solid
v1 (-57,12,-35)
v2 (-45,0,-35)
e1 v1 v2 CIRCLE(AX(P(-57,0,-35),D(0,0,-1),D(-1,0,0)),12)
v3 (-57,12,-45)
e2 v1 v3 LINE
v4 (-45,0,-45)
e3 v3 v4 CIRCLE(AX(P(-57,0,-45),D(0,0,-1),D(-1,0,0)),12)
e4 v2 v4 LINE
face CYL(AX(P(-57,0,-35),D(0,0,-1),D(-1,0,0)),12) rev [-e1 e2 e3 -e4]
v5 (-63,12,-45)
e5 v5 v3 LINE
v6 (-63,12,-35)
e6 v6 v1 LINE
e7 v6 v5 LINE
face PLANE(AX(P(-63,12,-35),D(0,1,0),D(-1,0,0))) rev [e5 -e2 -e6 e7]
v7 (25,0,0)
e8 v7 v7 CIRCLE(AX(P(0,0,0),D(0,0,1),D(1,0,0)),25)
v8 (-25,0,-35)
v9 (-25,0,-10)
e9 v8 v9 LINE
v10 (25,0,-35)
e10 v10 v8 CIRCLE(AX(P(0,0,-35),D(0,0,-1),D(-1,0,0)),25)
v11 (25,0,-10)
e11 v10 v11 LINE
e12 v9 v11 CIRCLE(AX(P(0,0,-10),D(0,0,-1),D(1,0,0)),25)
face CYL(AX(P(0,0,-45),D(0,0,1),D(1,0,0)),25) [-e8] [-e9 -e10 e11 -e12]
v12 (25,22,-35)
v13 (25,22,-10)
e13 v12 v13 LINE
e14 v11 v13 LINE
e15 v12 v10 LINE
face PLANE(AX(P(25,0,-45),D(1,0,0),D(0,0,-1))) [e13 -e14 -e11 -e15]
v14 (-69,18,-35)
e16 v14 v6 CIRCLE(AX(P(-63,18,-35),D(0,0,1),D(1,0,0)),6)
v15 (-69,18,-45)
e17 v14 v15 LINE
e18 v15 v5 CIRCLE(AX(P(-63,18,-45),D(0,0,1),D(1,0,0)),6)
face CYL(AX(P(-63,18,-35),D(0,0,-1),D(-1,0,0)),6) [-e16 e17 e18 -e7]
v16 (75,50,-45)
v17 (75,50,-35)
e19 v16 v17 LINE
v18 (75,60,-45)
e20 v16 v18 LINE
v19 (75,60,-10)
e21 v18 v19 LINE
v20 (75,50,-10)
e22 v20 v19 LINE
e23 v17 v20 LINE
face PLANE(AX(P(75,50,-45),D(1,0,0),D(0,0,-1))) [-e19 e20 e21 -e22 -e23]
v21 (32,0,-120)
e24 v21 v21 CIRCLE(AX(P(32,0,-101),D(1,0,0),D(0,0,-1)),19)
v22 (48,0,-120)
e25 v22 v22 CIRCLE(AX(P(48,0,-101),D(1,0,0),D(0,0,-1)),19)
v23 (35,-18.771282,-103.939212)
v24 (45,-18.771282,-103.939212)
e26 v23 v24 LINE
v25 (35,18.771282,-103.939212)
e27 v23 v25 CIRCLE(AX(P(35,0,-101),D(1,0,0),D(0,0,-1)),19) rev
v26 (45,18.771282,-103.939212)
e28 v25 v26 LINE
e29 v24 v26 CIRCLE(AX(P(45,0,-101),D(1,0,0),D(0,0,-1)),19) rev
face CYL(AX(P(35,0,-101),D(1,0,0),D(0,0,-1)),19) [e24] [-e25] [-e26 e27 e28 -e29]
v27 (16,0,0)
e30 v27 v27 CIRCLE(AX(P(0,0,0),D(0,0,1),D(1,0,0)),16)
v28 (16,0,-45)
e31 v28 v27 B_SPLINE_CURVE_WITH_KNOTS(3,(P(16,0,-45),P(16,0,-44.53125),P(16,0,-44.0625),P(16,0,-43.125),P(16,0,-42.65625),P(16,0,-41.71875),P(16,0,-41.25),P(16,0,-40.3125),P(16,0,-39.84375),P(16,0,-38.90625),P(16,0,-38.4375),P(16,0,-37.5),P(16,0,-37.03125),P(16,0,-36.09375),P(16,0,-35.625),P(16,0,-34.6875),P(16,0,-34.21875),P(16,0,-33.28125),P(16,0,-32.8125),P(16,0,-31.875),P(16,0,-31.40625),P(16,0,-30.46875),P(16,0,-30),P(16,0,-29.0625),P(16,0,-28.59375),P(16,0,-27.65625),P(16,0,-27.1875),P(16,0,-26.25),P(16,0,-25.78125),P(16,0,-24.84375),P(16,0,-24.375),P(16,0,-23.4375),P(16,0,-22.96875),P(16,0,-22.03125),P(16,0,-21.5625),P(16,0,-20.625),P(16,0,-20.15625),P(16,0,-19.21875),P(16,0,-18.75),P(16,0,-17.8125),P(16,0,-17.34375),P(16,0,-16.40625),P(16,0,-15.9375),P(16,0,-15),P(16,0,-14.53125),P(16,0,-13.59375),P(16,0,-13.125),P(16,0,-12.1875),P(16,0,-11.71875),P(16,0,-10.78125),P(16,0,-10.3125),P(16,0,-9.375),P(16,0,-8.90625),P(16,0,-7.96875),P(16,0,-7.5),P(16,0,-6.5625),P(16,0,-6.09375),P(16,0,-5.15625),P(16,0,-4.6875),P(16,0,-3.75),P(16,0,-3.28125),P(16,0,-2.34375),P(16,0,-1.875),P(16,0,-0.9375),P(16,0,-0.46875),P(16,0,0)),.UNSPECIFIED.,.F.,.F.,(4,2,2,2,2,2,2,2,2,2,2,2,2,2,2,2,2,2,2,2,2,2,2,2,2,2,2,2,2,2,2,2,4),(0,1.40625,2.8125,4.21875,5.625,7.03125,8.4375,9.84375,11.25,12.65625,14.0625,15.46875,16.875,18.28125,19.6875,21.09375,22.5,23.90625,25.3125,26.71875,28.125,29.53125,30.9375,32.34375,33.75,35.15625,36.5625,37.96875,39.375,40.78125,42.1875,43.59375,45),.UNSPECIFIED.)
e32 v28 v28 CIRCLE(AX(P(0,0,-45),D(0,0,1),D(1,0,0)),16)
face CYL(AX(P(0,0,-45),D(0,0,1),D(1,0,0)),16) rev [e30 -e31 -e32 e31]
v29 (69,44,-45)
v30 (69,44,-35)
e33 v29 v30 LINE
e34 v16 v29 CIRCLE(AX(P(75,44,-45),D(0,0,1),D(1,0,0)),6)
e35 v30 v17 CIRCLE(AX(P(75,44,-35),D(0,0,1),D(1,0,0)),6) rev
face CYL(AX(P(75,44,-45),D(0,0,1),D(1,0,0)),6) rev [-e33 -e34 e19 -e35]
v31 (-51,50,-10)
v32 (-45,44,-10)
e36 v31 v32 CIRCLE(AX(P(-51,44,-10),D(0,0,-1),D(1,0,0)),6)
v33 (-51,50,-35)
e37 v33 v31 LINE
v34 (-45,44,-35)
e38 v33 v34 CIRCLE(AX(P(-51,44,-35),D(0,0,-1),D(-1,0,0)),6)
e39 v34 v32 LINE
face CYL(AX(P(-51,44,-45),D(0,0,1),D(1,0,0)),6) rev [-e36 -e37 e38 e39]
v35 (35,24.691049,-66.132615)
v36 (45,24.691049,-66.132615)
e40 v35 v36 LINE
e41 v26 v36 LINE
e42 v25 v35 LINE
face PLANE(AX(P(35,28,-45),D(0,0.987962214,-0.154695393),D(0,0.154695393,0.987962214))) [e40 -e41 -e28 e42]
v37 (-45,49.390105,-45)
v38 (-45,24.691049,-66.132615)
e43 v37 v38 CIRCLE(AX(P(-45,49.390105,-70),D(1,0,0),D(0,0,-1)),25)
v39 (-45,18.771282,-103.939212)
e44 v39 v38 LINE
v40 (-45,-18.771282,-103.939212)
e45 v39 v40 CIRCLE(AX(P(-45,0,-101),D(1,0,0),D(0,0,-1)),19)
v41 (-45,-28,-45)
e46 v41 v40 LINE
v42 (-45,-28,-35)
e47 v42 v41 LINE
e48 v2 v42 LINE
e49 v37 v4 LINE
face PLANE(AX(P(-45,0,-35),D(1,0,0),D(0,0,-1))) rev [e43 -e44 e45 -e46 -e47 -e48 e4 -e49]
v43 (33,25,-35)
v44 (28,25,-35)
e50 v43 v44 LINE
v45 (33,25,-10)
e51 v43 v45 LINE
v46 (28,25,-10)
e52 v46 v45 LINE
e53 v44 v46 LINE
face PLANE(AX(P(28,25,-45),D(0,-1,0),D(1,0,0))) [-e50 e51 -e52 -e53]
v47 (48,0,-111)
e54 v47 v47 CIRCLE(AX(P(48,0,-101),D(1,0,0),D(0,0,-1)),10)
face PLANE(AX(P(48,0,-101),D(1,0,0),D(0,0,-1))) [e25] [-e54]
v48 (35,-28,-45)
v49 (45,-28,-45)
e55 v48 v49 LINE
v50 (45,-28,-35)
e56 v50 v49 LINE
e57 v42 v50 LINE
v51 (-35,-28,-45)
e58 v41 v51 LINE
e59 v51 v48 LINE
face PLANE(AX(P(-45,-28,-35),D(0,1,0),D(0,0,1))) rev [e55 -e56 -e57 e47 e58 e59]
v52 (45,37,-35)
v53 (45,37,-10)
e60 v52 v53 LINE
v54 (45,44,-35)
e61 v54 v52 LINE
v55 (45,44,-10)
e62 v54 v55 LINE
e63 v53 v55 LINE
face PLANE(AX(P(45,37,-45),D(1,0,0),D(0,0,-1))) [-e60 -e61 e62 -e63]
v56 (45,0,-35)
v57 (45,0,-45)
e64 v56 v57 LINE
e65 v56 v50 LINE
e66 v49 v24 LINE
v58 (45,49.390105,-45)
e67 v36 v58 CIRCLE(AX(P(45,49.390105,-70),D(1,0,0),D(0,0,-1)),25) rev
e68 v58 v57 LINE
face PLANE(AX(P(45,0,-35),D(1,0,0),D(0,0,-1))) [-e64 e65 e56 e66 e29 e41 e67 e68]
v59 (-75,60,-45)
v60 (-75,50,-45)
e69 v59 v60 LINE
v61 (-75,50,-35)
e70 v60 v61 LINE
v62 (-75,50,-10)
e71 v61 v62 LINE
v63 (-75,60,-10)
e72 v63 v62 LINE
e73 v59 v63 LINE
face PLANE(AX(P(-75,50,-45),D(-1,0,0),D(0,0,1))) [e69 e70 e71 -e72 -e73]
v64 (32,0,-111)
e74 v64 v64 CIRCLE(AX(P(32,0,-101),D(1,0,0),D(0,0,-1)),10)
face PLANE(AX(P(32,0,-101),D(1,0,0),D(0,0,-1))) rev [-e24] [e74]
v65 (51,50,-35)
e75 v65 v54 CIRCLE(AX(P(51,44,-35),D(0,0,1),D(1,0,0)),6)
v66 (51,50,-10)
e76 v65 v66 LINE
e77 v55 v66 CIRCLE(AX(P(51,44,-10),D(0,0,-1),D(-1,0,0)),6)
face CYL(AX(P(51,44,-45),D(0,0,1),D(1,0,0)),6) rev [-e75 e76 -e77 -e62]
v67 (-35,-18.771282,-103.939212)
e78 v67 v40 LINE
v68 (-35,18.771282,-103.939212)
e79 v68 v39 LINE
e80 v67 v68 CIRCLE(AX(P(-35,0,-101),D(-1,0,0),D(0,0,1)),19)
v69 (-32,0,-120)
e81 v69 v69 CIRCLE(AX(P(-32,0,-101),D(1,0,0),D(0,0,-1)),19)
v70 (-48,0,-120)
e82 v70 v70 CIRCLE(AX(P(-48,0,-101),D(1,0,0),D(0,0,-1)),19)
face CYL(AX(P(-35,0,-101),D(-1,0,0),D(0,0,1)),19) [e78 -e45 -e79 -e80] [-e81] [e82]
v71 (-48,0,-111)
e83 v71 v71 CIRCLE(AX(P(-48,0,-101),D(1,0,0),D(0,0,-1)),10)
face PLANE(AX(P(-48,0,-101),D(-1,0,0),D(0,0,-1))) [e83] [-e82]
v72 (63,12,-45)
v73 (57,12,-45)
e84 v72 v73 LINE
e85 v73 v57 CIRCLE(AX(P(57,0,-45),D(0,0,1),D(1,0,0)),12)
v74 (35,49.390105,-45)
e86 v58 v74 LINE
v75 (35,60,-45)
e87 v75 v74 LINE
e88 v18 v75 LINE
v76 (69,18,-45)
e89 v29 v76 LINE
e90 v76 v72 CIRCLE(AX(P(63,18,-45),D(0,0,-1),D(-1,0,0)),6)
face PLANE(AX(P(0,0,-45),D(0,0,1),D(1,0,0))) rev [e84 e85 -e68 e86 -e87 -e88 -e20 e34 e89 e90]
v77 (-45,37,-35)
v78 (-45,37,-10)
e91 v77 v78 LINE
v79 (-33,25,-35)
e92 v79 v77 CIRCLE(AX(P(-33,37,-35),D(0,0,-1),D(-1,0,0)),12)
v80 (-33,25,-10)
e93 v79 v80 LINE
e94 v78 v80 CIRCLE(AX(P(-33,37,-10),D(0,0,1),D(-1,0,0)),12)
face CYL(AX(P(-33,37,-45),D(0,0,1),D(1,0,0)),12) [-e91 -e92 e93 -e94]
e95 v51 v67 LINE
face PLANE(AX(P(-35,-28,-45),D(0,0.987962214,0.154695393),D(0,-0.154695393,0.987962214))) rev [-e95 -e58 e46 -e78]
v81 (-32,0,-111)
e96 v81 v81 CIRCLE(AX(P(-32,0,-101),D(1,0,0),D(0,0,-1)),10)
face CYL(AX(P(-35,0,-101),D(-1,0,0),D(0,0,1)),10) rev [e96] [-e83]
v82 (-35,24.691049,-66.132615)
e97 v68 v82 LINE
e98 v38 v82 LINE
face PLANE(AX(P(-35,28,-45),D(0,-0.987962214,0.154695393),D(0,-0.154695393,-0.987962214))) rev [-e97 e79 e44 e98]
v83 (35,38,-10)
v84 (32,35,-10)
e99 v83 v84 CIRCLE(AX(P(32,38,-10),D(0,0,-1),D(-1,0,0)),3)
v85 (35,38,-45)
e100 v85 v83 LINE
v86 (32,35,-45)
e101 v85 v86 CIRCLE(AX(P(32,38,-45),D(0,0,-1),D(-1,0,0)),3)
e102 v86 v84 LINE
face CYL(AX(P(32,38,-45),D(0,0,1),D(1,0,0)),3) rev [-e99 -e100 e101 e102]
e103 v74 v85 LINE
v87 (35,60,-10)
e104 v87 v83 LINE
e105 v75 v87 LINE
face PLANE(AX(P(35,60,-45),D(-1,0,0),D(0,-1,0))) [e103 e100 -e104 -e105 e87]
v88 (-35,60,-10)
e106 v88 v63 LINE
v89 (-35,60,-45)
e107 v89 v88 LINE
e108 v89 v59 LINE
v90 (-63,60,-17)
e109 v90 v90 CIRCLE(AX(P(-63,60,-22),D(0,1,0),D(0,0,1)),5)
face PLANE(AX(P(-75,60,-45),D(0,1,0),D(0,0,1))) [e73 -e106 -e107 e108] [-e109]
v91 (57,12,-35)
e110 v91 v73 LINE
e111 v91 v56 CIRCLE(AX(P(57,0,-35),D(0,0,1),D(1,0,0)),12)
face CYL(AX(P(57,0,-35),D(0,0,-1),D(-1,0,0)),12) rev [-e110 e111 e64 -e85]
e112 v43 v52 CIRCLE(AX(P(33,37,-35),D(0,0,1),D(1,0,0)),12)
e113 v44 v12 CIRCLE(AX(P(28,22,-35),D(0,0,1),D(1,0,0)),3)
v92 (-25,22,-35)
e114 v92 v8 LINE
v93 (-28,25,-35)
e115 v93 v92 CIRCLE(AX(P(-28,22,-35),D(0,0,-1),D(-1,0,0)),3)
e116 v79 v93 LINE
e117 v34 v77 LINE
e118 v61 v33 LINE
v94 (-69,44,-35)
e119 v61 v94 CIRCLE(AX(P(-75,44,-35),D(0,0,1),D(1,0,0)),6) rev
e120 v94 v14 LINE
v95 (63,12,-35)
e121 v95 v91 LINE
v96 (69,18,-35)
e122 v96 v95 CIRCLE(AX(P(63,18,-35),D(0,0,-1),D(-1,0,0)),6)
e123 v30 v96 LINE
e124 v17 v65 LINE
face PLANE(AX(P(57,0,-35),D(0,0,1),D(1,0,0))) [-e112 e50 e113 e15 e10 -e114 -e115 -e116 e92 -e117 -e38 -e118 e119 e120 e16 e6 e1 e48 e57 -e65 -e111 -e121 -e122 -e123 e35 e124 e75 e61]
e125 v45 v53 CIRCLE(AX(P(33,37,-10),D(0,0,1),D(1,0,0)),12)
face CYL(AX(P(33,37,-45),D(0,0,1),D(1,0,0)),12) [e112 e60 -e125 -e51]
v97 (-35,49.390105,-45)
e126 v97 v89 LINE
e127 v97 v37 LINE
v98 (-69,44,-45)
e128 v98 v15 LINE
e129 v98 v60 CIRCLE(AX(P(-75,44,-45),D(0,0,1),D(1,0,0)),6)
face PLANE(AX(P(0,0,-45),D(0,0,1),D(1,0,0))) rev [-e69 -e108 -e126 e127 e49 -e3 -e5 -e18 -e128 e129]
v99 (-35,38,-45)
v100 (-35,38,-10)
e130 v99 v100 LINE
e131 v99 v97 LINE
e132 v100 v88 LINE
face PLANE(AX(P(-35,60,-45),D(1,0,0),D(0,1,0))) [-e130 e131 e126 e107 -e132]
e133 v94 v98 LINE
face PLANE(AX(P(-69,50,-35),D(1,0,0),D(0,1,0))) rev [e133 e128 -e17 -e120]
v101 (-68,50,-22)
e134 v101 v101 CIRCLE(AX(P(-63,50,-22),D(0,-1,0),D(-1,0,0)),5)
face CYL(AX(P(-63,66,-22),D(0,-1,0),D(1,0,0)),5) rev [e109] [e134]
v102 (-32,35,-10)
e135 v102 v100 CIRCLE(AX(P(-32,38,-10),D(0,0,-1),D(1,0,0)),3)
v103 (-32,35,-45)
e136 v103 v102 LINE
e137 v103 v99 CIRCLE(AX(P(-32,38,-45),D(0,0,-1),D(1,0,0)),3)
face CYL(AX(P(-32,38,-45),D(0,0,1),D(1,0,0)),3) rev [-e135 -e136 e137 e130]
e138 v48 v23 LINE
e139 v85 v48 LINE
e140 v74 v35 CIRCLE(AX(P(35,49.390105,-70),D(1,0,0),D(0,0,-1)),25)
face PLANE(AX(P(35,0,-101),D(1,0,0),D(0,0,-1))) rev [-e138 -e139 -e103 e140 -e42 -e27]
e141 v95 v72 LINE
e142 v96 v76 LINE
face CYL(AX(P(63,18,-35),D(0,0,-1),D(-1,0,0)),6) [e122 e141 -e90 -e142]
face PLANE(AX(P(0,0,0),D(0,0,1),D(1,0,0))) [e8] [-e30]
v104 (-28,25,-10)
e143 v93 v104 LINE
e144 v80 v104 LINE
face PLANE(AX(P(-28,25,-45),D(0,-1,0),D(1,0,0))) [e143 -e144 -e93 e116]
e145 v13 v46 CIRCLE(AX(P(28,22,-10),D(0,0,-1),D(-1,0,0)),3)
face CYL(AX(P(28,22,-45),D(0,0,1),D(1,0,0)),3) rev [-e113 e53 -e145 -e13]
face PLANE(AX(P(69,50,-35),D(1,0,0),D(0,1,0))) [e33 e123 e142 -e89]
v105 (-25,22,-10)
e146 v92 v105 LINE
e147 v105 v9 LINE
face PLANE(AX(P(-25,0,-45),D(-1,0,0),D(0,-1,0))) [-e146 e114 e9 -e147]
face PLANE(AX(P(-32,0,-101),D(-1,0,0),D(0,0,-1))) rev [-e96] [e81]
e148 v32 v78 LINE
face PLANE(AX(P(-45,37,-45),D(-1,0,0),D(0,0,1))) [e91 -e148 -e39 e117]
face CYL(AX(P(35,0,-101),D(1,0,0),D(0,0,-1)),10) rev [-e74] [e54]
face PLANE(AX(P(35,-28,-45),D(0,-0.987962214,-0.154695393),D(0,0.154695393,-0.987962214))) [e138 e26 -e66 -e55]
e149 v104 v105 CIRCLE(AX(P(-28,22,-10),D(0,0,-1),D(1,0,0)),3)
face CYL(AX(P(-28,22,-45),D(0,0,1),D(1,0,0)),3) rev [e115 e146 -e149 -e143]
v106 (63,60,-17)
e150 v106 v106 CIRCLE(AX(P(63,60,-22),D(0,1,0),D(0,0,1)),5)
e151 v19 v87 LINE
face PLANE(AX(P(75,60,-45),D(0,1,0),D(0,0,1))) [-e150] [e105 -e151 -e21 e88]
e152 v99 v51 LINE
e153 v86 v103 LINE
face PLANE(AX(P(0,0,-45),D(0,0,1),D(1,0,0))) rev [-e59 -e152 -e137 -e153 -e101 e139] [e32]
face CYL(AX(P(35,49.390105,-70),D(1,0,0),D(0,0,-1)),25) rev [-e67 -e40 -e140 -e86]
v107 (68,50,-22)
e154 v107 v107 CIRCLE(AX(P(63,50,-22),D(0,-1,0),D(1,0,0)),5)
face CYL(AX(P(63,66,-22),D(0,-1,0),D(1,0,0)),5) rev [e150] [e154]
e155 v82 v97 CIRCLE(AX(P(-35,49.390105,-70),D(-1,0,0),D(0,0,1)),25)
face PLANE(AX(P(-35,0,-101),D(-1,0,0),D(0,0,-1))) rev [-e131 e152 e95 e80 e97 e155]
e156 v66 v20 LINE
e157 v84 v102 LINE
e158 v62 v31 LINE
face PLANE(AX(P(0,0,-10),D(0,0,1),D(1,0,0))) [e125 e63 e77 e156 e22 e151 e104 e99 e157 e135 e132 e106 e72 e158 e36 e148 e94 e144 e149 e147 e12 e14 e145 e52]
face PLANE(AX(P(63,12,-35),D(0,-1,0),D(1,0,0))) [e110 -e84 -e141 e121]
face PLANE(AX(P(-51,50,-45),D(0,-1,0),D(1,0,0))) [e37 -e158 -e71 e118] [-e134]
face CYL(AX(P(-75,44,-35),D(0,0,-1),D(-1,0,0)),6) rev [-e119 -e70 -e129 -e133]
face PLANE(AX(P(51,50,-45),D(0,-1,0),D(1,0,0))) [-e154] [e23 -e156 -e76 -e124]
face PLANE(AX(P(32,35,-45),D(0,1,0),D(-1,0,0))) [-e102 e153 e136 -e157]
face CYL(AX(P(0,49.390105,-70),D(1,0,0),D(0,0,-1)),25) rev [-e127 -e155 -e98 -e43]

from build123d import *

# Parameters (mm, degrees)
IZIM1_R                     = 25
IZIM1_R_2                   = 16
Y_KSEKLIK_EKSTR_ZYON1_DEPTH = 45
Y_KSEKLIK_EKSTR_ZYON2_DEPTH = 35
Y_KSEKLIK_EKSTR_ZYON4_START = -10
Y_KSEKLIK_EKSTR_ZYON4_DEPTH = 10
RADYUS2_R                   = 6
IZIM6_R                     = 10
Y_KSEKLIK_EKSTR_ZYON6_DEPTH = 10
IZIM7_R                     = 19
IZIM7_R_2                   = 10
Y_KSEKLIK_EKSTR_ZYON7_DEPTH = 8
RADYUS3_R                   = 25
AYNALAMA1_START             = -45
AYNALAMA1_OUTLINE_R         = 10
AYNALAMA1_DEPTH             = 10
AYNALAMA1_START_2           = -48
AYNALAMA1_2_OUTLINE_R       = 19
AYNALAMA1_2_OUTLINE_R_2     = 10
AYNALAMA1_2_DEPTH           = 16
IZIM8_R                     = 5
KES_EKSTR_ZYON1_DEPTH       = 16


# Read off the part's stored shape, not the designer's step: Aynalama1
# Some blends are built 0.0001 mm under size
with BuildPart() as part:
    # Çizim1 → Yükseklik-Ekstrüzyon1 (new body)
    with BuildSketch(Plane.XY):
        Circle(IZIM1_R)
        Circle(IZIM1_R_2, mode=Mode.SUBTRACT)
    extrude(amount=-Y_KSEKLIK_EKSTR_ZYON1_DEPTH)

    # Çizim4 → Yükseklik-Ekstrüzyon2 (add)
    with BuildSketch(Plane.XY.offset(-10)):
        with BuildLine():
            Line((25, 0), (25, 22))
            ThreePointArc((25, 22), (25.878679656, 24.121320344), (28, 25))
            Line((28, 25), (33, 25))
            ThreePointArc((33, 25), (41.485281374, 28.514718626), (45, 37))
            Line((45, 37), (45, 44))
            ThreePointArc((45, 44), (46.757359313, 48.242640687), (51, 50))
            Line((51, 50), (75, 50))
            Line((75, 50), (75, 60))
            Line((75, 60), (35, 60))
            Line((35, 60), (35, 38))
            ThreePointArc((35, 38), (34.121320344, 35.878679656), (32, 35))
            Line((32, 35), (-32, 35))
            ThreePointArc((-32, 35), (-34.121320344, 35.878679656), (-35, 38))
            Line((-35, 38), (-35, 60))
            Line((-35, 60), (-75, 60))
            Line((-75, 60), (-75, 50))
            Line((-75, 50), (-51, 50))
            ThreePointArc((-51, 50), (-46.757359313, 48.242640687), (-45, 44))
            Line((-45, 44), (-45, 37))
            ThreePointArc((-45, 37), (-41.485281374, 28.514718626), (-33, 25))
            Line((-33, 25), (-28, 25))
            ThreePointArc((-28, 25), (-25.878679656, 24.121320344), (-25, 22))
            Line((-25, 22), (-25, 0))
            ThreePointArc((-25, 0), (0, 25), (25, 0))
        make_face()
    extrude(amount=-Y_KSEKLIK_EKSTR_ZYON2_DEPTH)

    # Çizim5 → Yükseklik-Ekstrüzyon4 (add)
    with BuildSketch(Plane(origin=(0, 0, -45), x_dir=(-1, 0, 0), z_dir=(0, 0, -1)).offset(Y_KSEKLIK_EKSTR_ZYON4_START)):
        with BuildLine():
            Line((69, 50), (69, 18))
            ThreePointArc((69, 18), (67.242640687, 13.757359313), (63, 12))
            Line((63, 12), (57, 12))
            ThreePointArc((57, 12), (48.514718626, 8.485281374), (45, 0))
            Line((45, 0), (45, -28))
            Line((45, -28), (-45, -28))
            Line((-45, -28), (-45, 0))
            ThreePointArc((-45, 0), (-48.514718626, 8.485281374), (-57, 12))
            Line((-57, 12), (-63, 12))
            ThreePointArc((-63, 12), (-67.242640687, 13.757359313), (-69, 18))
            Line((-69, 18), (-69, 50))
            Line((-69, 50), (-51, 50))
            ThreePointArc((-51, 50), (-46.757359313, 48.242640687), (-45, 44))
            Line((-45, 44), (-45, 37))
            ThreePointArc((-45, 37), (-41.485281374, 28.514718626), (-33, 25))
            Line((-33, 25), (-28, 25))
            ThreePointArc((-28, 25), (-25.878679656, 24.121320344), (-25, 22))
            Line((-25, 22), (-25, 0))
            ThreePointArc((-25, 0), (0, -25), (25, 0))
            Line((25, 0), (25, 22))
            ThreePointArc((25, 22), (25.878679656, 24.121320344), (28, 25))
            Line((28, 25), (33, 25))
            ThreePointArc((33, 25), (41.485281374, 28.514718626), (45, 37))
            Line((45, 37), (45, 44))
            ThreePointArc((45, 44), (46.757359313, 48.242640687), (51, 50))
            Line((51, 50), (69, 50))
        make_face()
    extrude(amount=Y_KSEKLIK_EKSTR_ZYON4_DEPTH)

    # Radyus2
    radyus2_edges = [part.edges().sort_by_distance(p)[0] for p in [
        (-69, 50, -40),
        (69, 50, -40),
    ]]
    fillet(radyus2_edges, radius=RADYUS2_R - 0.0001)  # a hair under: the kernel refuses the full size

    # Çizim6 → Yükseklik-Ekstrüzyon6 (add)
    with BuildSketch(Plane(origin=(45, 0, 0), x_dir=(0, 0, -1), z_dir=(1, 0, 0))):
        with BuildLine():
            Line((45, -28), (103.939212458, -18.771282059))
            ThreePointArc((103.939212458, -18.771282059), (120, 0), (103.939212458, 18.771282059))
            Line((103.939212458, 18.771282059), (45, 28))
            Line((45, 28), (45, -28))
        make_face()
        with Locations((101, 0)):
            Circle(IZIM6_R, mode=Mode.SUBTRACT)
    extrude(amount=-Y_KSEKLIK_EKSTR_ZYON6_DEPTH)

    # Çizim7 → Yükseklik-Ekstrüzyon7 (add, symmetric)
    with BuildSketch(Plane(origin=(40, 0, 0), x_dir=(0, 0, -1), z_dir=(1, 0, 0))):
        with Locations((101, 0)):
            Circle(IZIM7_R)
        with Locations((101, 0)):
            Circle(IZIM7_R_2, mode=Mode.SUBTRACT)
    extrude(amount=Y_KSEKLIK_EKSTR_ZYON7_DEPTH, both=True)

    # Radyus3
    # the kernel refuses this fillet: 25 mm, written as the material it adds along each edge
    with BuildSketch(Plane(origin=(45, 28, -45), x_dir=(0, 1, 0), z_dir=(-1, 0, 0))) as radyus3_piece_1:
        with BuildLine():
            CenterArc((RADYUS3_R * 0.855604187922, RADYUS3_R), RADYUS3_R, 188.899130451, 81.100869549)
            Line((-RADYUS3_R * 0.132358025694, RADYUS3_R * 0.845304607478), (0, 0))
            Line((0, 0), (RADYUS3_R * 0.855604187922, 0))
        make_face()
    extrude(amount=10)

    # Aynalama1 outline → Aynalama1 (add)
    with BuildSketch(Plane.YZ.offset(AYNALAMA1_START)):
        with BuildLine():
            ThreePointArc((-18.771282059, -103.939212458), (0, -120), (18.771282059, -103.939212458))
            Line((18.771282059, -103.939212458), (24.691049358, -66.132615187))
            ThreePointArc((24.691049358, -66.132615187), (33.137176044, -51.004150186), (49.390104698, -45))
            Line((49.390104698, -45), (-28, -45))
            Line((-28, -45), (-18.771282059, -103.939212458))
        make_face()
        with Locations((0, -101)):
            Circle(AYNALAMA1_OUTLINE_R, mode=Mode.SUBTRACT)
    extrude(amount=AYNALAMA1_DEPTH)

    # Aynalama1 2 outline → Aynalama1 2 (add)
    with BuildSketch(Plane.YZ.offset(AYNALAMA1_START_2)):
        with Locations((0, -101)):
            Circle(AYNALAMA1_2_OUTLINE_R)
        with Locations((0, -101)):
            Circle(AYNALAMA1_2_OUTLINE_R_2, mode=Mode.SUBTRACT)
    extrude(amount=AYNALAMA1_2_DEPTH)

    # Çizim8 → Kes-Ekstrüzyon1 (cut)
    with BuildSketch(Plane.XZ.offset(-50)):
        with Locations((63, -22)):
            Circle(IZIM8_R)
        with Locations(Location((-63, -22, 0), (0, 0, 90))):
            Circle(IZIM8_R)
    extrude(amount=-KES_EKSTR_ZYON1_DEPTH, mode=Mode.SUBTRACT)


solid = part.part
